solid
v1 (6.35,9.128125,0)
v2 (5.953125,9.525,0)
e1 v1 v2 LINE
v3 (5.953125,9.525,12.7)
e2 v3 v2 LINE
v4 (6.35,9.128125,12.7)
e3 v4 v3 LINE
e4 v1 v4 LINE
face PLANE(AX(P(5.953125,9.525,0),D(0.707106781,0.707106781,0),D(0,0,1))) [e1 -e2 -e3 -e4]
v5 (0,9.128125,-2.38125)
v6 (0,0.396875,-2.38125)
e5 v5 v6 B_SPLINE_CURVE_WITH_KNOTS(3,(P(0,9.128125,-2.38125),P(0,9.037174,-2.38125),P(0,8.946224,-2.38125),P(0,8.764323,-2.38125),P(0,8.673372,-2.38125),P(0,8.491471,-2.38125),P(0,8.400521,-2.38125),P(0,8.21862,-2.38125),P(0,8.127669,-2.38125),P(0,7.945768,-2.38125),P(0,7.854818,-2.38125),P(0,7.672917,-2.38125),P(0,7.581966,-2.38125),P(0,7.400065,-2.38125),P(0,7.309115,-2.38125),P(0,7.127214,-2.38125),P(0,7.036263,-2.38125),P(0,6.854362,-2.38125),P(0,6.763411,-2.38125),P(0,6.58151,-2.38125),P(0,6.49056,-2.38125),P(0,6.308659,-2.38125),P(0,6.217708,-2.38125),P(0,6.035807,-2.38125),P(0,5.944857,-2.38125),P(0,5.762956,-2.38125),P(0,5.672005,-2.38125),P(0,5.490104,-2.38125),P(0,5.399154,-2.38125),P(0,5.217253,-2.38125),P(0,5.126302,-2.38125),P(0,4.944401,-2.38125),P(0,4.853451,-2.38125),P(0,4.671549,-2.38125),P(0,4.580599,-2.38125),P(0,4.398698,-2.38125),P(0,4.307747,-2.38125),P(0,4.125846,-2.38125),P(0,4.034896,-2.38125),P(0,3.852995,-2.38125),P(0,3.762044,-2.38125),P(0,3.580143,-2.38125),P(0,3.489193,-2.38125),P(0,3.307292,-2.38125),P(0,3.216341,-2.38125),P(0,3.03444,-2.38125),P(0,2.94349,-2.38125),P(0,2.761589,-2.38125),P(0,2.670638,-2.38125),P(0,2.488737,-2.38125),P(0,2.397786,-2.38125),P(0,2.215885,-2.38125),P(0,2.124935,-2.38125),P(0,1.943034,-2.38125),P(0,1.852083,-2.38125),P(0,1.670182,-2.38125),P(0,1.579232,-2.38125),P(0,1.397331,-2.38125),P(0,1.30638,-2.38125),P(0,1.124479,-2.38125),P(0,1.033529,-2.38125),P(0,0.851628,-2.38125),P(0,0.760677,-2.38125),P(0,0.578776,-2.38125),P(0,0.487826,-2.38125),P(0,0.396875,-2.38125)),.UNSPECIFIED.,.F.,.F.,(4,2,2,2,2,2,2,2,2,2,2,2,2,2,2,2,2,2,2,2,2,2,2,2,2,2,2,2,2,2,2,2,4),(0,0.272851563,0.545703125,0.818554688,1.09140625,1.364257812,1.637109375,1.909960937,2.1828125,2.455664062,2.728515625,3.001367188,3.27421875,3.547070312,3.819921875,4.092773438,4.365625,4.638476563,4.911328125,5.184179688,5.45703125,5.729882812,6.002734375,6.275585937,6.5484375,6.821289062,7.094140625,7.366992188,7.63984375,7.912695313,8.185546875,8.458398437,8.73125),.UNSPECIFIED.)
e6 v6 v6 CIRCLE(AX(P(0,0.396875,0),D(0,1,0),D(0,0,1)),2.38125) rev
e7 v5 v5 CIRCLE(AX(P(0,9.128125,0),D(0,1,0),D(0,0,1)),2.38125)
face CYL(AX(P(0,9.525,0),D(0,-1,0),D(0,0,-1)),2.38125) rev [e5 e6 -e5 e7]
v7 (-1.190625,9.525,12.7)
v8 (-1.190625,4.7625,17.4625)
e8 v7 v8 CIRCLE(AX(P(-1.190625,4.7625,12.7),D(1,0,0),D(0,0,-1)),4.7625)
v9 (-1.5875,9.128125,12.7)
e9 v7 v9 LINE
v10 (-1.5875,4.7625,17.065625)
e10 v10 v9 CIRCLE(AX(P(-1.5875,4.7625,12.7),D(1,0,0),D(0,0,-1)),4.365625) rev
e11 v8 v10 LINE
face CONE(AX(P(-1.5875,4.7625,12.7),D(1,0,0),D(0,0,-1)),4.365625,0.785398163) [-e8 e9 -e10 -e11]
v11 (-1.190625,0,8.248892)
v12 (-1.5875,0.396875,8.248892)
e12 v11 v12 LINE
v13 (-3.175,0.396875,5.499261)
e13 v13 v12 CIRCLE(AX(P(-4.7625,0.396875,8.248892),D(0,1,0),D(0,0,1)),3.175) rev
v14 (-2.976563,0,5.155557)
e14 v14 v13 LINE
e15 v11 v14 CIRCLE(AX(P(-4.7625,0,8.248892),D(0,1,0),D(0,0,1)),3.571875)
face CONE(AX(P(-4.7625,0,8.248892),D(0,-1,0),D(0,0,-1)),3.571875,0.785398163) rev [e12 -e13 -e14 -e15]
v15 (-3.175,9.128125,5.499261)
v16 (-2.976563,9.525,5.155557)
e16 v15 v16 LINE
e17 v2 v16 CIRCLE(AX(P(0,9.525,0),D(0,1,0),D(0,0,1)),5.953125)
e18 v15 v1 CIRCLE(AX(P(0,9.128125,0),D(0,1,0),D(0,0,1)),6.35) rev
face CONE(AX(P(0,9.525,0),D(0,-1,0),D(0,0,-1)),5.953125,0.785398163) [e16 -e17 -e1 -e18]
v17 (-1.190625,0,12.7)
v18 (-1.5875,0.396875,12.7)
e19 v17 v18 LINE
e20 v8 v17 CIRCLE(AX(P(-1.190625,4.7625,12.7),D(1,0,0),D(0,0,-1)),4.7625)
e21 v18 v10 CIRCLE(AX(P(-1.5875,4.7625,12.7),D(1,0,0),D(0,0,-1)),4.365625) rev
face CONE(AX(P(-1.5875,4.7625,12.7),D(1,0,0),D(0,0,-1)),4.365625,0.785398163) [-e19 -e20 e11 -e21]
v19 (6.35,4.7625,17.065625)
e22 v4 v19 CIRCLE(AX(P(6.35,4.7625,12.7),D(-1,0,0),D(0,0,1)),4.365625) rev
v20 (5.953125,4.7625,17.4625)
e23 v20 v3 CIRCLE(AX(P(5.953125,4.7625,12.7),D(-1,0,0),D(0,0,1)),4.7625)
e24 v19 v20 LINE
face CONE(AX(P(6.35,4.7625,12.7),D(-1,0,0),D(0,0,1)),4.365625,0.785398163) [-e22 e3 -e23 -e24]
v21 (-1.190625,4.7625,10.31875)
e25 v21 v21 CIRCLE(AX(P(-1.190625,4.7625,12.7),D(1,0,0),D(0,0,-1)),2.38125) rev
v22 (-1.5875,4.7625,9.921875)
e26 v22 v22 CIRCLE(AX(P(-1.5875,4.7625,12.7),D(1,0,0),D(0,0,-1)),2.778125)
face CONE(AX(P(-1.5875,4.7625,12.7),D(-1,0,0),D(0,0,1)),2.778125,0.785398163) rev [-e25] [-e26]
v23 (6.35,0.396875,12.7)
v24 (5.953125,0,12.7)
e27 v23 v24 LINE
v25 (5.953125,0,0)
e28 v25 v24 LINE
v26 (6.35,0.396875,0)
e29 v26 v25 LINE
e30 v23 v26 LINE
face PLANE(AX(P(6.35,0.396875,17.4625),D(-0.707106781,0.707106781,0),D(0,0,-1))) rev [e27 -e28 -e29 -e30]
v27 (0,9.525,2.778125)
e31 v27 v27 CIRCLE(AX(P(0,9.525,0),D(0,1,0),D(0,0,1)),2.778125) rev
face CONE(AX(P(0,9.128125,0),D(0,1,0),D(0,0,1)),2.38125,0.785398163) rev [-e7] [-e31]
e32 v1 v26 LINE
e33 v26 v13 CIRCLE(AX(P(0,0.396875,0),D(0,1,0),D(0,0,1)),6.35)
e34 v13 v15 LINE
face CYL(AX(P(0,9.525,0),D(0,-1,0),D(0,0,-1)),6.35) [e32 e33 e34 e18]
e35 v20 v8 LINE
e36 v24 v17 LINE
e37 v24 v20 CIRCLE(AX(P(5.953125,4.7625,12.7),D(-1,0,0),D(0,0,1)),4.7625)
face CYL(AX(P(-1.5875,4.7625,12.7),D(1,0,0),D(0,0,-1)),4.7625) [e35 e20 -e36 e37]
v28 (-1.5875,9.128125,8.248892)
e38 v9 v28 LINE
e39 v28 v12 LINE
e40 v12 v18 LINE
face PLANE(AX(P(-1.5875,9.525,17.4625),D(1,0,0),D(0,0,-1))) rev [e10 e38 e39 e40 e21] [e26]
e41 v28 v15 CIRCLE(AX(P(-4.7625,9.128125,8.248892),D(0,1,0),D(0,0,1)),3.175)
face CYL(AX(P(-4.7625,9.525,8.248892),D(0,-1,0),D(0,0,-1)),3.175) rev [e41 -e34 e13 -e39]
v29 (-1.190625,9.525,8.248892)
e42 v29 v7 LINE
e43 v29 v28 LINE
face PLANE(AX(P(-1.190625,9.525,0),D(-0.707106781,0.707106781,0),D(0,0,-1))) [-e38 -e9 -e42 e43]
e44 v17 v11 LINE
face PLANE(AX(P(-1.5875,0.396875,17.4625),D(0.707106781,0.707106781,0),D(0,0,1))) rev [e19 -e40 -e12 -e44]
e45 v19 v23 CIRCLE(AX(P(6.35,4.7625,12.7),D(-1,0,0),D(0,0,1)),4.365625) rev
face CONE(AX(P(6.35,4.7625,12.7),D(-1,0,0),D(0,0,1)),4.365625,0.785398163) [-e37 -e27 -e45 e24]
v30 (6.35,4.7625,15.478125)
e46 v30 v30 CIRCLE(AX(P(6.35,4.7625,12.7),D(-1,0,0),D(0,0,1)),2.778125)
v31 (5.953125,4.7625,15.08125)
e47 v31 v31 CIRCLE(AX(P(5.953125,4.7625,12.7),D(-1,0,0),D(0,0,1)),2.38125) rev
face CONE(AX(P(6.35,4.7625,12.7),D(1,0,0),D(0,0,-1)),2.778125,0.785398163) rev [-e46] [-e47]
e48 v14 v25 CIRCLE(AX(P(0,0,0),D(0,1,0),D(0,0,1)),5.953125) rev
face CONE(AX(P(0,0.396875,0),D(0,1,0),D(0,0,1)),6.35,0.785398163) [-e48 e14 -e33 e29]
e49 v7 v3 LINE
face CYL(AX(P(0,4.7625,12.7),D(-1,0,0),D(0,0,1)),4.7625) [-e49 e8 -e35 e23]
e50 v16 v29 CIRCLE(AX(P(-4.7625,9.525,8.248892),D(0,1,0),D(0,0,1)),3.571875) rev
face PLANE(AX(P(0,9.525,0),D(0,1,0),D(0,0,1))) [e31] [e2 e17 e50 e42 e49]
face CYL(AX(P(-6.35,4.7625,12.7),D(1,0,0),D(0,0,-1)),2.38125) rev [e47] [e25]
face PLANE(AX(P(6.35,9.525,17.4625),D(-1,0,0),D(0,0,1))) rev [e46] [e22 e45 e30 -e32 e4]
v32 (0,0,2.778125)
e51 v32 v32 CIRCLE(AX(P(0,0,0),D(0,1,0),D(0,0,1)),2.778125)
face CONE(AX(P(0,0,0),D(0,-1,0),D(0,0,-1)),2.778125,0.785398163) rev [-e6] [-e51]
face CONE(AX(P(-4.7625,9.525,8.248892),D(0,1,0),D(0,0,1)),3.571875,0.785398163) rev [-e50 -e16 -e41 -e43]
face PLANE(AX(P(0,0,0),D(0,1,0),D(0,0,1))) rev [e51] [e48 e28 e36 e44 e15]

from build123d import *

# Parameters (mm, degrees)
SKETCH1_R               = 2.38125
BOSS_EXTRUDE1_DEPTH     = 9.525
CUT_EXTRUDE3_DEPTH      = 24.599884136
CUT_EXTRUDE3_DEPTH_BACK = 24.599884136
SKETCH5_R               = 2.38125
FILLET1_R               = 4.7625
FILLET2_R               = 3.175
CHAMFER1_SIZE           = 0.396875


with BuildPart() as part:
    # Sketch1 → Boss-Extrude1 (new body)
    with BuildSketch(Plane(origin=(0, 0, 0), x_dir=(1, 0, 0), z_dir=(0, 1, 0))):
        with BuildLine():
            Line((-1.5875, -17.4625), (-1.5875, -6.148361062))
            ThreePointArc((-1.5875, -6.148361062), (-3.888564967, 5.020115786), (6.35, 0))
            Line((6.35, 0), (6.35, -17.4625))
            Line((6.35, -17.4625), (-1.5875, -17.4625))
        make_face()
        with Locations(Location((0, 0, 0), (0, 0, 90))):
            Circle(SKETCH1_R, mode=Mode.SUBTRACT)
    extrude(amount=BOSS_EXTRUDE1_DEPTH)

    # Sketch5 → Cut-Extrude3 (cut, two sides: drawn at the far end of the back side and taken through both)
    with BuildSketch(Plane(origin=(6.35, 0, 0), x_dir=(0, 0, -1), z_dir=(1, 0, 0)).offset(-CUT_EXTRUDE3_DEPTH_BACK)):
        with Locations((-12.7, 4.7625)):
            Circle(SKETCH5_R)
    extrude(amount=CUT_EXTRUDE3_DEPTH + CUT_EXTRUDE3_DEPTH_BACK, mode=Mode.SUBTRACT)

    # Fillet1
    fillet1_edges = [part.edges().sort_by_distance(p)[0] for p in [
        (2.38125, 0, 17.4625),
        (2.38125, 9.525, 17.4625),
    ]]
    fillet(fillet1_edges, radius=FILLET1_R - 0.0001)  # a hair under: the kernel refuses the full size

    # Fillet2
    fillet2_edges = [part.edges().sort_by_distance(p)[0] for p in [
        (-1.5875, 4.7625, 6.148361062),
    ]]
    fillet(fillet2_edges, radius=FILLET2_R)

    # Chamfer1
    chamfer1_edges = [part.edges().sort_by_distance(p)[0] for p in [
        (0, 0, 2.38125),
        (0, 9.525, 2.38125),
        (-3.175, 9.525, -5.499261314),
        (-1.5875, 4.7625, 15.08125),
        (6.35, 4.7625, 15.08125),
        (6.35, 0, 6.35005),
        (6.35, 9.525, 6.35005),
        (6.35, 8.130125335, 16.067625335),
        (6.35, 1.394874665, 16.067625335),
        (-1.5875, 8.130125335, 16.067625335),
        (-1.5875, 1.394874665, 16.067625335),
        (-1.5875, 0, 10.474495986),
        (-1.5875, 9.525, 10.474495986),
        (-2.012869343, 0, 6.661391971),
        (-2.012869343, 9.525, 6.661391971),
        (-3.175, 0, -5.499261314),
    ]]
    chamfer(chamfer1_edges, length=CHAMFER1_SIZE)


solid = part.part
